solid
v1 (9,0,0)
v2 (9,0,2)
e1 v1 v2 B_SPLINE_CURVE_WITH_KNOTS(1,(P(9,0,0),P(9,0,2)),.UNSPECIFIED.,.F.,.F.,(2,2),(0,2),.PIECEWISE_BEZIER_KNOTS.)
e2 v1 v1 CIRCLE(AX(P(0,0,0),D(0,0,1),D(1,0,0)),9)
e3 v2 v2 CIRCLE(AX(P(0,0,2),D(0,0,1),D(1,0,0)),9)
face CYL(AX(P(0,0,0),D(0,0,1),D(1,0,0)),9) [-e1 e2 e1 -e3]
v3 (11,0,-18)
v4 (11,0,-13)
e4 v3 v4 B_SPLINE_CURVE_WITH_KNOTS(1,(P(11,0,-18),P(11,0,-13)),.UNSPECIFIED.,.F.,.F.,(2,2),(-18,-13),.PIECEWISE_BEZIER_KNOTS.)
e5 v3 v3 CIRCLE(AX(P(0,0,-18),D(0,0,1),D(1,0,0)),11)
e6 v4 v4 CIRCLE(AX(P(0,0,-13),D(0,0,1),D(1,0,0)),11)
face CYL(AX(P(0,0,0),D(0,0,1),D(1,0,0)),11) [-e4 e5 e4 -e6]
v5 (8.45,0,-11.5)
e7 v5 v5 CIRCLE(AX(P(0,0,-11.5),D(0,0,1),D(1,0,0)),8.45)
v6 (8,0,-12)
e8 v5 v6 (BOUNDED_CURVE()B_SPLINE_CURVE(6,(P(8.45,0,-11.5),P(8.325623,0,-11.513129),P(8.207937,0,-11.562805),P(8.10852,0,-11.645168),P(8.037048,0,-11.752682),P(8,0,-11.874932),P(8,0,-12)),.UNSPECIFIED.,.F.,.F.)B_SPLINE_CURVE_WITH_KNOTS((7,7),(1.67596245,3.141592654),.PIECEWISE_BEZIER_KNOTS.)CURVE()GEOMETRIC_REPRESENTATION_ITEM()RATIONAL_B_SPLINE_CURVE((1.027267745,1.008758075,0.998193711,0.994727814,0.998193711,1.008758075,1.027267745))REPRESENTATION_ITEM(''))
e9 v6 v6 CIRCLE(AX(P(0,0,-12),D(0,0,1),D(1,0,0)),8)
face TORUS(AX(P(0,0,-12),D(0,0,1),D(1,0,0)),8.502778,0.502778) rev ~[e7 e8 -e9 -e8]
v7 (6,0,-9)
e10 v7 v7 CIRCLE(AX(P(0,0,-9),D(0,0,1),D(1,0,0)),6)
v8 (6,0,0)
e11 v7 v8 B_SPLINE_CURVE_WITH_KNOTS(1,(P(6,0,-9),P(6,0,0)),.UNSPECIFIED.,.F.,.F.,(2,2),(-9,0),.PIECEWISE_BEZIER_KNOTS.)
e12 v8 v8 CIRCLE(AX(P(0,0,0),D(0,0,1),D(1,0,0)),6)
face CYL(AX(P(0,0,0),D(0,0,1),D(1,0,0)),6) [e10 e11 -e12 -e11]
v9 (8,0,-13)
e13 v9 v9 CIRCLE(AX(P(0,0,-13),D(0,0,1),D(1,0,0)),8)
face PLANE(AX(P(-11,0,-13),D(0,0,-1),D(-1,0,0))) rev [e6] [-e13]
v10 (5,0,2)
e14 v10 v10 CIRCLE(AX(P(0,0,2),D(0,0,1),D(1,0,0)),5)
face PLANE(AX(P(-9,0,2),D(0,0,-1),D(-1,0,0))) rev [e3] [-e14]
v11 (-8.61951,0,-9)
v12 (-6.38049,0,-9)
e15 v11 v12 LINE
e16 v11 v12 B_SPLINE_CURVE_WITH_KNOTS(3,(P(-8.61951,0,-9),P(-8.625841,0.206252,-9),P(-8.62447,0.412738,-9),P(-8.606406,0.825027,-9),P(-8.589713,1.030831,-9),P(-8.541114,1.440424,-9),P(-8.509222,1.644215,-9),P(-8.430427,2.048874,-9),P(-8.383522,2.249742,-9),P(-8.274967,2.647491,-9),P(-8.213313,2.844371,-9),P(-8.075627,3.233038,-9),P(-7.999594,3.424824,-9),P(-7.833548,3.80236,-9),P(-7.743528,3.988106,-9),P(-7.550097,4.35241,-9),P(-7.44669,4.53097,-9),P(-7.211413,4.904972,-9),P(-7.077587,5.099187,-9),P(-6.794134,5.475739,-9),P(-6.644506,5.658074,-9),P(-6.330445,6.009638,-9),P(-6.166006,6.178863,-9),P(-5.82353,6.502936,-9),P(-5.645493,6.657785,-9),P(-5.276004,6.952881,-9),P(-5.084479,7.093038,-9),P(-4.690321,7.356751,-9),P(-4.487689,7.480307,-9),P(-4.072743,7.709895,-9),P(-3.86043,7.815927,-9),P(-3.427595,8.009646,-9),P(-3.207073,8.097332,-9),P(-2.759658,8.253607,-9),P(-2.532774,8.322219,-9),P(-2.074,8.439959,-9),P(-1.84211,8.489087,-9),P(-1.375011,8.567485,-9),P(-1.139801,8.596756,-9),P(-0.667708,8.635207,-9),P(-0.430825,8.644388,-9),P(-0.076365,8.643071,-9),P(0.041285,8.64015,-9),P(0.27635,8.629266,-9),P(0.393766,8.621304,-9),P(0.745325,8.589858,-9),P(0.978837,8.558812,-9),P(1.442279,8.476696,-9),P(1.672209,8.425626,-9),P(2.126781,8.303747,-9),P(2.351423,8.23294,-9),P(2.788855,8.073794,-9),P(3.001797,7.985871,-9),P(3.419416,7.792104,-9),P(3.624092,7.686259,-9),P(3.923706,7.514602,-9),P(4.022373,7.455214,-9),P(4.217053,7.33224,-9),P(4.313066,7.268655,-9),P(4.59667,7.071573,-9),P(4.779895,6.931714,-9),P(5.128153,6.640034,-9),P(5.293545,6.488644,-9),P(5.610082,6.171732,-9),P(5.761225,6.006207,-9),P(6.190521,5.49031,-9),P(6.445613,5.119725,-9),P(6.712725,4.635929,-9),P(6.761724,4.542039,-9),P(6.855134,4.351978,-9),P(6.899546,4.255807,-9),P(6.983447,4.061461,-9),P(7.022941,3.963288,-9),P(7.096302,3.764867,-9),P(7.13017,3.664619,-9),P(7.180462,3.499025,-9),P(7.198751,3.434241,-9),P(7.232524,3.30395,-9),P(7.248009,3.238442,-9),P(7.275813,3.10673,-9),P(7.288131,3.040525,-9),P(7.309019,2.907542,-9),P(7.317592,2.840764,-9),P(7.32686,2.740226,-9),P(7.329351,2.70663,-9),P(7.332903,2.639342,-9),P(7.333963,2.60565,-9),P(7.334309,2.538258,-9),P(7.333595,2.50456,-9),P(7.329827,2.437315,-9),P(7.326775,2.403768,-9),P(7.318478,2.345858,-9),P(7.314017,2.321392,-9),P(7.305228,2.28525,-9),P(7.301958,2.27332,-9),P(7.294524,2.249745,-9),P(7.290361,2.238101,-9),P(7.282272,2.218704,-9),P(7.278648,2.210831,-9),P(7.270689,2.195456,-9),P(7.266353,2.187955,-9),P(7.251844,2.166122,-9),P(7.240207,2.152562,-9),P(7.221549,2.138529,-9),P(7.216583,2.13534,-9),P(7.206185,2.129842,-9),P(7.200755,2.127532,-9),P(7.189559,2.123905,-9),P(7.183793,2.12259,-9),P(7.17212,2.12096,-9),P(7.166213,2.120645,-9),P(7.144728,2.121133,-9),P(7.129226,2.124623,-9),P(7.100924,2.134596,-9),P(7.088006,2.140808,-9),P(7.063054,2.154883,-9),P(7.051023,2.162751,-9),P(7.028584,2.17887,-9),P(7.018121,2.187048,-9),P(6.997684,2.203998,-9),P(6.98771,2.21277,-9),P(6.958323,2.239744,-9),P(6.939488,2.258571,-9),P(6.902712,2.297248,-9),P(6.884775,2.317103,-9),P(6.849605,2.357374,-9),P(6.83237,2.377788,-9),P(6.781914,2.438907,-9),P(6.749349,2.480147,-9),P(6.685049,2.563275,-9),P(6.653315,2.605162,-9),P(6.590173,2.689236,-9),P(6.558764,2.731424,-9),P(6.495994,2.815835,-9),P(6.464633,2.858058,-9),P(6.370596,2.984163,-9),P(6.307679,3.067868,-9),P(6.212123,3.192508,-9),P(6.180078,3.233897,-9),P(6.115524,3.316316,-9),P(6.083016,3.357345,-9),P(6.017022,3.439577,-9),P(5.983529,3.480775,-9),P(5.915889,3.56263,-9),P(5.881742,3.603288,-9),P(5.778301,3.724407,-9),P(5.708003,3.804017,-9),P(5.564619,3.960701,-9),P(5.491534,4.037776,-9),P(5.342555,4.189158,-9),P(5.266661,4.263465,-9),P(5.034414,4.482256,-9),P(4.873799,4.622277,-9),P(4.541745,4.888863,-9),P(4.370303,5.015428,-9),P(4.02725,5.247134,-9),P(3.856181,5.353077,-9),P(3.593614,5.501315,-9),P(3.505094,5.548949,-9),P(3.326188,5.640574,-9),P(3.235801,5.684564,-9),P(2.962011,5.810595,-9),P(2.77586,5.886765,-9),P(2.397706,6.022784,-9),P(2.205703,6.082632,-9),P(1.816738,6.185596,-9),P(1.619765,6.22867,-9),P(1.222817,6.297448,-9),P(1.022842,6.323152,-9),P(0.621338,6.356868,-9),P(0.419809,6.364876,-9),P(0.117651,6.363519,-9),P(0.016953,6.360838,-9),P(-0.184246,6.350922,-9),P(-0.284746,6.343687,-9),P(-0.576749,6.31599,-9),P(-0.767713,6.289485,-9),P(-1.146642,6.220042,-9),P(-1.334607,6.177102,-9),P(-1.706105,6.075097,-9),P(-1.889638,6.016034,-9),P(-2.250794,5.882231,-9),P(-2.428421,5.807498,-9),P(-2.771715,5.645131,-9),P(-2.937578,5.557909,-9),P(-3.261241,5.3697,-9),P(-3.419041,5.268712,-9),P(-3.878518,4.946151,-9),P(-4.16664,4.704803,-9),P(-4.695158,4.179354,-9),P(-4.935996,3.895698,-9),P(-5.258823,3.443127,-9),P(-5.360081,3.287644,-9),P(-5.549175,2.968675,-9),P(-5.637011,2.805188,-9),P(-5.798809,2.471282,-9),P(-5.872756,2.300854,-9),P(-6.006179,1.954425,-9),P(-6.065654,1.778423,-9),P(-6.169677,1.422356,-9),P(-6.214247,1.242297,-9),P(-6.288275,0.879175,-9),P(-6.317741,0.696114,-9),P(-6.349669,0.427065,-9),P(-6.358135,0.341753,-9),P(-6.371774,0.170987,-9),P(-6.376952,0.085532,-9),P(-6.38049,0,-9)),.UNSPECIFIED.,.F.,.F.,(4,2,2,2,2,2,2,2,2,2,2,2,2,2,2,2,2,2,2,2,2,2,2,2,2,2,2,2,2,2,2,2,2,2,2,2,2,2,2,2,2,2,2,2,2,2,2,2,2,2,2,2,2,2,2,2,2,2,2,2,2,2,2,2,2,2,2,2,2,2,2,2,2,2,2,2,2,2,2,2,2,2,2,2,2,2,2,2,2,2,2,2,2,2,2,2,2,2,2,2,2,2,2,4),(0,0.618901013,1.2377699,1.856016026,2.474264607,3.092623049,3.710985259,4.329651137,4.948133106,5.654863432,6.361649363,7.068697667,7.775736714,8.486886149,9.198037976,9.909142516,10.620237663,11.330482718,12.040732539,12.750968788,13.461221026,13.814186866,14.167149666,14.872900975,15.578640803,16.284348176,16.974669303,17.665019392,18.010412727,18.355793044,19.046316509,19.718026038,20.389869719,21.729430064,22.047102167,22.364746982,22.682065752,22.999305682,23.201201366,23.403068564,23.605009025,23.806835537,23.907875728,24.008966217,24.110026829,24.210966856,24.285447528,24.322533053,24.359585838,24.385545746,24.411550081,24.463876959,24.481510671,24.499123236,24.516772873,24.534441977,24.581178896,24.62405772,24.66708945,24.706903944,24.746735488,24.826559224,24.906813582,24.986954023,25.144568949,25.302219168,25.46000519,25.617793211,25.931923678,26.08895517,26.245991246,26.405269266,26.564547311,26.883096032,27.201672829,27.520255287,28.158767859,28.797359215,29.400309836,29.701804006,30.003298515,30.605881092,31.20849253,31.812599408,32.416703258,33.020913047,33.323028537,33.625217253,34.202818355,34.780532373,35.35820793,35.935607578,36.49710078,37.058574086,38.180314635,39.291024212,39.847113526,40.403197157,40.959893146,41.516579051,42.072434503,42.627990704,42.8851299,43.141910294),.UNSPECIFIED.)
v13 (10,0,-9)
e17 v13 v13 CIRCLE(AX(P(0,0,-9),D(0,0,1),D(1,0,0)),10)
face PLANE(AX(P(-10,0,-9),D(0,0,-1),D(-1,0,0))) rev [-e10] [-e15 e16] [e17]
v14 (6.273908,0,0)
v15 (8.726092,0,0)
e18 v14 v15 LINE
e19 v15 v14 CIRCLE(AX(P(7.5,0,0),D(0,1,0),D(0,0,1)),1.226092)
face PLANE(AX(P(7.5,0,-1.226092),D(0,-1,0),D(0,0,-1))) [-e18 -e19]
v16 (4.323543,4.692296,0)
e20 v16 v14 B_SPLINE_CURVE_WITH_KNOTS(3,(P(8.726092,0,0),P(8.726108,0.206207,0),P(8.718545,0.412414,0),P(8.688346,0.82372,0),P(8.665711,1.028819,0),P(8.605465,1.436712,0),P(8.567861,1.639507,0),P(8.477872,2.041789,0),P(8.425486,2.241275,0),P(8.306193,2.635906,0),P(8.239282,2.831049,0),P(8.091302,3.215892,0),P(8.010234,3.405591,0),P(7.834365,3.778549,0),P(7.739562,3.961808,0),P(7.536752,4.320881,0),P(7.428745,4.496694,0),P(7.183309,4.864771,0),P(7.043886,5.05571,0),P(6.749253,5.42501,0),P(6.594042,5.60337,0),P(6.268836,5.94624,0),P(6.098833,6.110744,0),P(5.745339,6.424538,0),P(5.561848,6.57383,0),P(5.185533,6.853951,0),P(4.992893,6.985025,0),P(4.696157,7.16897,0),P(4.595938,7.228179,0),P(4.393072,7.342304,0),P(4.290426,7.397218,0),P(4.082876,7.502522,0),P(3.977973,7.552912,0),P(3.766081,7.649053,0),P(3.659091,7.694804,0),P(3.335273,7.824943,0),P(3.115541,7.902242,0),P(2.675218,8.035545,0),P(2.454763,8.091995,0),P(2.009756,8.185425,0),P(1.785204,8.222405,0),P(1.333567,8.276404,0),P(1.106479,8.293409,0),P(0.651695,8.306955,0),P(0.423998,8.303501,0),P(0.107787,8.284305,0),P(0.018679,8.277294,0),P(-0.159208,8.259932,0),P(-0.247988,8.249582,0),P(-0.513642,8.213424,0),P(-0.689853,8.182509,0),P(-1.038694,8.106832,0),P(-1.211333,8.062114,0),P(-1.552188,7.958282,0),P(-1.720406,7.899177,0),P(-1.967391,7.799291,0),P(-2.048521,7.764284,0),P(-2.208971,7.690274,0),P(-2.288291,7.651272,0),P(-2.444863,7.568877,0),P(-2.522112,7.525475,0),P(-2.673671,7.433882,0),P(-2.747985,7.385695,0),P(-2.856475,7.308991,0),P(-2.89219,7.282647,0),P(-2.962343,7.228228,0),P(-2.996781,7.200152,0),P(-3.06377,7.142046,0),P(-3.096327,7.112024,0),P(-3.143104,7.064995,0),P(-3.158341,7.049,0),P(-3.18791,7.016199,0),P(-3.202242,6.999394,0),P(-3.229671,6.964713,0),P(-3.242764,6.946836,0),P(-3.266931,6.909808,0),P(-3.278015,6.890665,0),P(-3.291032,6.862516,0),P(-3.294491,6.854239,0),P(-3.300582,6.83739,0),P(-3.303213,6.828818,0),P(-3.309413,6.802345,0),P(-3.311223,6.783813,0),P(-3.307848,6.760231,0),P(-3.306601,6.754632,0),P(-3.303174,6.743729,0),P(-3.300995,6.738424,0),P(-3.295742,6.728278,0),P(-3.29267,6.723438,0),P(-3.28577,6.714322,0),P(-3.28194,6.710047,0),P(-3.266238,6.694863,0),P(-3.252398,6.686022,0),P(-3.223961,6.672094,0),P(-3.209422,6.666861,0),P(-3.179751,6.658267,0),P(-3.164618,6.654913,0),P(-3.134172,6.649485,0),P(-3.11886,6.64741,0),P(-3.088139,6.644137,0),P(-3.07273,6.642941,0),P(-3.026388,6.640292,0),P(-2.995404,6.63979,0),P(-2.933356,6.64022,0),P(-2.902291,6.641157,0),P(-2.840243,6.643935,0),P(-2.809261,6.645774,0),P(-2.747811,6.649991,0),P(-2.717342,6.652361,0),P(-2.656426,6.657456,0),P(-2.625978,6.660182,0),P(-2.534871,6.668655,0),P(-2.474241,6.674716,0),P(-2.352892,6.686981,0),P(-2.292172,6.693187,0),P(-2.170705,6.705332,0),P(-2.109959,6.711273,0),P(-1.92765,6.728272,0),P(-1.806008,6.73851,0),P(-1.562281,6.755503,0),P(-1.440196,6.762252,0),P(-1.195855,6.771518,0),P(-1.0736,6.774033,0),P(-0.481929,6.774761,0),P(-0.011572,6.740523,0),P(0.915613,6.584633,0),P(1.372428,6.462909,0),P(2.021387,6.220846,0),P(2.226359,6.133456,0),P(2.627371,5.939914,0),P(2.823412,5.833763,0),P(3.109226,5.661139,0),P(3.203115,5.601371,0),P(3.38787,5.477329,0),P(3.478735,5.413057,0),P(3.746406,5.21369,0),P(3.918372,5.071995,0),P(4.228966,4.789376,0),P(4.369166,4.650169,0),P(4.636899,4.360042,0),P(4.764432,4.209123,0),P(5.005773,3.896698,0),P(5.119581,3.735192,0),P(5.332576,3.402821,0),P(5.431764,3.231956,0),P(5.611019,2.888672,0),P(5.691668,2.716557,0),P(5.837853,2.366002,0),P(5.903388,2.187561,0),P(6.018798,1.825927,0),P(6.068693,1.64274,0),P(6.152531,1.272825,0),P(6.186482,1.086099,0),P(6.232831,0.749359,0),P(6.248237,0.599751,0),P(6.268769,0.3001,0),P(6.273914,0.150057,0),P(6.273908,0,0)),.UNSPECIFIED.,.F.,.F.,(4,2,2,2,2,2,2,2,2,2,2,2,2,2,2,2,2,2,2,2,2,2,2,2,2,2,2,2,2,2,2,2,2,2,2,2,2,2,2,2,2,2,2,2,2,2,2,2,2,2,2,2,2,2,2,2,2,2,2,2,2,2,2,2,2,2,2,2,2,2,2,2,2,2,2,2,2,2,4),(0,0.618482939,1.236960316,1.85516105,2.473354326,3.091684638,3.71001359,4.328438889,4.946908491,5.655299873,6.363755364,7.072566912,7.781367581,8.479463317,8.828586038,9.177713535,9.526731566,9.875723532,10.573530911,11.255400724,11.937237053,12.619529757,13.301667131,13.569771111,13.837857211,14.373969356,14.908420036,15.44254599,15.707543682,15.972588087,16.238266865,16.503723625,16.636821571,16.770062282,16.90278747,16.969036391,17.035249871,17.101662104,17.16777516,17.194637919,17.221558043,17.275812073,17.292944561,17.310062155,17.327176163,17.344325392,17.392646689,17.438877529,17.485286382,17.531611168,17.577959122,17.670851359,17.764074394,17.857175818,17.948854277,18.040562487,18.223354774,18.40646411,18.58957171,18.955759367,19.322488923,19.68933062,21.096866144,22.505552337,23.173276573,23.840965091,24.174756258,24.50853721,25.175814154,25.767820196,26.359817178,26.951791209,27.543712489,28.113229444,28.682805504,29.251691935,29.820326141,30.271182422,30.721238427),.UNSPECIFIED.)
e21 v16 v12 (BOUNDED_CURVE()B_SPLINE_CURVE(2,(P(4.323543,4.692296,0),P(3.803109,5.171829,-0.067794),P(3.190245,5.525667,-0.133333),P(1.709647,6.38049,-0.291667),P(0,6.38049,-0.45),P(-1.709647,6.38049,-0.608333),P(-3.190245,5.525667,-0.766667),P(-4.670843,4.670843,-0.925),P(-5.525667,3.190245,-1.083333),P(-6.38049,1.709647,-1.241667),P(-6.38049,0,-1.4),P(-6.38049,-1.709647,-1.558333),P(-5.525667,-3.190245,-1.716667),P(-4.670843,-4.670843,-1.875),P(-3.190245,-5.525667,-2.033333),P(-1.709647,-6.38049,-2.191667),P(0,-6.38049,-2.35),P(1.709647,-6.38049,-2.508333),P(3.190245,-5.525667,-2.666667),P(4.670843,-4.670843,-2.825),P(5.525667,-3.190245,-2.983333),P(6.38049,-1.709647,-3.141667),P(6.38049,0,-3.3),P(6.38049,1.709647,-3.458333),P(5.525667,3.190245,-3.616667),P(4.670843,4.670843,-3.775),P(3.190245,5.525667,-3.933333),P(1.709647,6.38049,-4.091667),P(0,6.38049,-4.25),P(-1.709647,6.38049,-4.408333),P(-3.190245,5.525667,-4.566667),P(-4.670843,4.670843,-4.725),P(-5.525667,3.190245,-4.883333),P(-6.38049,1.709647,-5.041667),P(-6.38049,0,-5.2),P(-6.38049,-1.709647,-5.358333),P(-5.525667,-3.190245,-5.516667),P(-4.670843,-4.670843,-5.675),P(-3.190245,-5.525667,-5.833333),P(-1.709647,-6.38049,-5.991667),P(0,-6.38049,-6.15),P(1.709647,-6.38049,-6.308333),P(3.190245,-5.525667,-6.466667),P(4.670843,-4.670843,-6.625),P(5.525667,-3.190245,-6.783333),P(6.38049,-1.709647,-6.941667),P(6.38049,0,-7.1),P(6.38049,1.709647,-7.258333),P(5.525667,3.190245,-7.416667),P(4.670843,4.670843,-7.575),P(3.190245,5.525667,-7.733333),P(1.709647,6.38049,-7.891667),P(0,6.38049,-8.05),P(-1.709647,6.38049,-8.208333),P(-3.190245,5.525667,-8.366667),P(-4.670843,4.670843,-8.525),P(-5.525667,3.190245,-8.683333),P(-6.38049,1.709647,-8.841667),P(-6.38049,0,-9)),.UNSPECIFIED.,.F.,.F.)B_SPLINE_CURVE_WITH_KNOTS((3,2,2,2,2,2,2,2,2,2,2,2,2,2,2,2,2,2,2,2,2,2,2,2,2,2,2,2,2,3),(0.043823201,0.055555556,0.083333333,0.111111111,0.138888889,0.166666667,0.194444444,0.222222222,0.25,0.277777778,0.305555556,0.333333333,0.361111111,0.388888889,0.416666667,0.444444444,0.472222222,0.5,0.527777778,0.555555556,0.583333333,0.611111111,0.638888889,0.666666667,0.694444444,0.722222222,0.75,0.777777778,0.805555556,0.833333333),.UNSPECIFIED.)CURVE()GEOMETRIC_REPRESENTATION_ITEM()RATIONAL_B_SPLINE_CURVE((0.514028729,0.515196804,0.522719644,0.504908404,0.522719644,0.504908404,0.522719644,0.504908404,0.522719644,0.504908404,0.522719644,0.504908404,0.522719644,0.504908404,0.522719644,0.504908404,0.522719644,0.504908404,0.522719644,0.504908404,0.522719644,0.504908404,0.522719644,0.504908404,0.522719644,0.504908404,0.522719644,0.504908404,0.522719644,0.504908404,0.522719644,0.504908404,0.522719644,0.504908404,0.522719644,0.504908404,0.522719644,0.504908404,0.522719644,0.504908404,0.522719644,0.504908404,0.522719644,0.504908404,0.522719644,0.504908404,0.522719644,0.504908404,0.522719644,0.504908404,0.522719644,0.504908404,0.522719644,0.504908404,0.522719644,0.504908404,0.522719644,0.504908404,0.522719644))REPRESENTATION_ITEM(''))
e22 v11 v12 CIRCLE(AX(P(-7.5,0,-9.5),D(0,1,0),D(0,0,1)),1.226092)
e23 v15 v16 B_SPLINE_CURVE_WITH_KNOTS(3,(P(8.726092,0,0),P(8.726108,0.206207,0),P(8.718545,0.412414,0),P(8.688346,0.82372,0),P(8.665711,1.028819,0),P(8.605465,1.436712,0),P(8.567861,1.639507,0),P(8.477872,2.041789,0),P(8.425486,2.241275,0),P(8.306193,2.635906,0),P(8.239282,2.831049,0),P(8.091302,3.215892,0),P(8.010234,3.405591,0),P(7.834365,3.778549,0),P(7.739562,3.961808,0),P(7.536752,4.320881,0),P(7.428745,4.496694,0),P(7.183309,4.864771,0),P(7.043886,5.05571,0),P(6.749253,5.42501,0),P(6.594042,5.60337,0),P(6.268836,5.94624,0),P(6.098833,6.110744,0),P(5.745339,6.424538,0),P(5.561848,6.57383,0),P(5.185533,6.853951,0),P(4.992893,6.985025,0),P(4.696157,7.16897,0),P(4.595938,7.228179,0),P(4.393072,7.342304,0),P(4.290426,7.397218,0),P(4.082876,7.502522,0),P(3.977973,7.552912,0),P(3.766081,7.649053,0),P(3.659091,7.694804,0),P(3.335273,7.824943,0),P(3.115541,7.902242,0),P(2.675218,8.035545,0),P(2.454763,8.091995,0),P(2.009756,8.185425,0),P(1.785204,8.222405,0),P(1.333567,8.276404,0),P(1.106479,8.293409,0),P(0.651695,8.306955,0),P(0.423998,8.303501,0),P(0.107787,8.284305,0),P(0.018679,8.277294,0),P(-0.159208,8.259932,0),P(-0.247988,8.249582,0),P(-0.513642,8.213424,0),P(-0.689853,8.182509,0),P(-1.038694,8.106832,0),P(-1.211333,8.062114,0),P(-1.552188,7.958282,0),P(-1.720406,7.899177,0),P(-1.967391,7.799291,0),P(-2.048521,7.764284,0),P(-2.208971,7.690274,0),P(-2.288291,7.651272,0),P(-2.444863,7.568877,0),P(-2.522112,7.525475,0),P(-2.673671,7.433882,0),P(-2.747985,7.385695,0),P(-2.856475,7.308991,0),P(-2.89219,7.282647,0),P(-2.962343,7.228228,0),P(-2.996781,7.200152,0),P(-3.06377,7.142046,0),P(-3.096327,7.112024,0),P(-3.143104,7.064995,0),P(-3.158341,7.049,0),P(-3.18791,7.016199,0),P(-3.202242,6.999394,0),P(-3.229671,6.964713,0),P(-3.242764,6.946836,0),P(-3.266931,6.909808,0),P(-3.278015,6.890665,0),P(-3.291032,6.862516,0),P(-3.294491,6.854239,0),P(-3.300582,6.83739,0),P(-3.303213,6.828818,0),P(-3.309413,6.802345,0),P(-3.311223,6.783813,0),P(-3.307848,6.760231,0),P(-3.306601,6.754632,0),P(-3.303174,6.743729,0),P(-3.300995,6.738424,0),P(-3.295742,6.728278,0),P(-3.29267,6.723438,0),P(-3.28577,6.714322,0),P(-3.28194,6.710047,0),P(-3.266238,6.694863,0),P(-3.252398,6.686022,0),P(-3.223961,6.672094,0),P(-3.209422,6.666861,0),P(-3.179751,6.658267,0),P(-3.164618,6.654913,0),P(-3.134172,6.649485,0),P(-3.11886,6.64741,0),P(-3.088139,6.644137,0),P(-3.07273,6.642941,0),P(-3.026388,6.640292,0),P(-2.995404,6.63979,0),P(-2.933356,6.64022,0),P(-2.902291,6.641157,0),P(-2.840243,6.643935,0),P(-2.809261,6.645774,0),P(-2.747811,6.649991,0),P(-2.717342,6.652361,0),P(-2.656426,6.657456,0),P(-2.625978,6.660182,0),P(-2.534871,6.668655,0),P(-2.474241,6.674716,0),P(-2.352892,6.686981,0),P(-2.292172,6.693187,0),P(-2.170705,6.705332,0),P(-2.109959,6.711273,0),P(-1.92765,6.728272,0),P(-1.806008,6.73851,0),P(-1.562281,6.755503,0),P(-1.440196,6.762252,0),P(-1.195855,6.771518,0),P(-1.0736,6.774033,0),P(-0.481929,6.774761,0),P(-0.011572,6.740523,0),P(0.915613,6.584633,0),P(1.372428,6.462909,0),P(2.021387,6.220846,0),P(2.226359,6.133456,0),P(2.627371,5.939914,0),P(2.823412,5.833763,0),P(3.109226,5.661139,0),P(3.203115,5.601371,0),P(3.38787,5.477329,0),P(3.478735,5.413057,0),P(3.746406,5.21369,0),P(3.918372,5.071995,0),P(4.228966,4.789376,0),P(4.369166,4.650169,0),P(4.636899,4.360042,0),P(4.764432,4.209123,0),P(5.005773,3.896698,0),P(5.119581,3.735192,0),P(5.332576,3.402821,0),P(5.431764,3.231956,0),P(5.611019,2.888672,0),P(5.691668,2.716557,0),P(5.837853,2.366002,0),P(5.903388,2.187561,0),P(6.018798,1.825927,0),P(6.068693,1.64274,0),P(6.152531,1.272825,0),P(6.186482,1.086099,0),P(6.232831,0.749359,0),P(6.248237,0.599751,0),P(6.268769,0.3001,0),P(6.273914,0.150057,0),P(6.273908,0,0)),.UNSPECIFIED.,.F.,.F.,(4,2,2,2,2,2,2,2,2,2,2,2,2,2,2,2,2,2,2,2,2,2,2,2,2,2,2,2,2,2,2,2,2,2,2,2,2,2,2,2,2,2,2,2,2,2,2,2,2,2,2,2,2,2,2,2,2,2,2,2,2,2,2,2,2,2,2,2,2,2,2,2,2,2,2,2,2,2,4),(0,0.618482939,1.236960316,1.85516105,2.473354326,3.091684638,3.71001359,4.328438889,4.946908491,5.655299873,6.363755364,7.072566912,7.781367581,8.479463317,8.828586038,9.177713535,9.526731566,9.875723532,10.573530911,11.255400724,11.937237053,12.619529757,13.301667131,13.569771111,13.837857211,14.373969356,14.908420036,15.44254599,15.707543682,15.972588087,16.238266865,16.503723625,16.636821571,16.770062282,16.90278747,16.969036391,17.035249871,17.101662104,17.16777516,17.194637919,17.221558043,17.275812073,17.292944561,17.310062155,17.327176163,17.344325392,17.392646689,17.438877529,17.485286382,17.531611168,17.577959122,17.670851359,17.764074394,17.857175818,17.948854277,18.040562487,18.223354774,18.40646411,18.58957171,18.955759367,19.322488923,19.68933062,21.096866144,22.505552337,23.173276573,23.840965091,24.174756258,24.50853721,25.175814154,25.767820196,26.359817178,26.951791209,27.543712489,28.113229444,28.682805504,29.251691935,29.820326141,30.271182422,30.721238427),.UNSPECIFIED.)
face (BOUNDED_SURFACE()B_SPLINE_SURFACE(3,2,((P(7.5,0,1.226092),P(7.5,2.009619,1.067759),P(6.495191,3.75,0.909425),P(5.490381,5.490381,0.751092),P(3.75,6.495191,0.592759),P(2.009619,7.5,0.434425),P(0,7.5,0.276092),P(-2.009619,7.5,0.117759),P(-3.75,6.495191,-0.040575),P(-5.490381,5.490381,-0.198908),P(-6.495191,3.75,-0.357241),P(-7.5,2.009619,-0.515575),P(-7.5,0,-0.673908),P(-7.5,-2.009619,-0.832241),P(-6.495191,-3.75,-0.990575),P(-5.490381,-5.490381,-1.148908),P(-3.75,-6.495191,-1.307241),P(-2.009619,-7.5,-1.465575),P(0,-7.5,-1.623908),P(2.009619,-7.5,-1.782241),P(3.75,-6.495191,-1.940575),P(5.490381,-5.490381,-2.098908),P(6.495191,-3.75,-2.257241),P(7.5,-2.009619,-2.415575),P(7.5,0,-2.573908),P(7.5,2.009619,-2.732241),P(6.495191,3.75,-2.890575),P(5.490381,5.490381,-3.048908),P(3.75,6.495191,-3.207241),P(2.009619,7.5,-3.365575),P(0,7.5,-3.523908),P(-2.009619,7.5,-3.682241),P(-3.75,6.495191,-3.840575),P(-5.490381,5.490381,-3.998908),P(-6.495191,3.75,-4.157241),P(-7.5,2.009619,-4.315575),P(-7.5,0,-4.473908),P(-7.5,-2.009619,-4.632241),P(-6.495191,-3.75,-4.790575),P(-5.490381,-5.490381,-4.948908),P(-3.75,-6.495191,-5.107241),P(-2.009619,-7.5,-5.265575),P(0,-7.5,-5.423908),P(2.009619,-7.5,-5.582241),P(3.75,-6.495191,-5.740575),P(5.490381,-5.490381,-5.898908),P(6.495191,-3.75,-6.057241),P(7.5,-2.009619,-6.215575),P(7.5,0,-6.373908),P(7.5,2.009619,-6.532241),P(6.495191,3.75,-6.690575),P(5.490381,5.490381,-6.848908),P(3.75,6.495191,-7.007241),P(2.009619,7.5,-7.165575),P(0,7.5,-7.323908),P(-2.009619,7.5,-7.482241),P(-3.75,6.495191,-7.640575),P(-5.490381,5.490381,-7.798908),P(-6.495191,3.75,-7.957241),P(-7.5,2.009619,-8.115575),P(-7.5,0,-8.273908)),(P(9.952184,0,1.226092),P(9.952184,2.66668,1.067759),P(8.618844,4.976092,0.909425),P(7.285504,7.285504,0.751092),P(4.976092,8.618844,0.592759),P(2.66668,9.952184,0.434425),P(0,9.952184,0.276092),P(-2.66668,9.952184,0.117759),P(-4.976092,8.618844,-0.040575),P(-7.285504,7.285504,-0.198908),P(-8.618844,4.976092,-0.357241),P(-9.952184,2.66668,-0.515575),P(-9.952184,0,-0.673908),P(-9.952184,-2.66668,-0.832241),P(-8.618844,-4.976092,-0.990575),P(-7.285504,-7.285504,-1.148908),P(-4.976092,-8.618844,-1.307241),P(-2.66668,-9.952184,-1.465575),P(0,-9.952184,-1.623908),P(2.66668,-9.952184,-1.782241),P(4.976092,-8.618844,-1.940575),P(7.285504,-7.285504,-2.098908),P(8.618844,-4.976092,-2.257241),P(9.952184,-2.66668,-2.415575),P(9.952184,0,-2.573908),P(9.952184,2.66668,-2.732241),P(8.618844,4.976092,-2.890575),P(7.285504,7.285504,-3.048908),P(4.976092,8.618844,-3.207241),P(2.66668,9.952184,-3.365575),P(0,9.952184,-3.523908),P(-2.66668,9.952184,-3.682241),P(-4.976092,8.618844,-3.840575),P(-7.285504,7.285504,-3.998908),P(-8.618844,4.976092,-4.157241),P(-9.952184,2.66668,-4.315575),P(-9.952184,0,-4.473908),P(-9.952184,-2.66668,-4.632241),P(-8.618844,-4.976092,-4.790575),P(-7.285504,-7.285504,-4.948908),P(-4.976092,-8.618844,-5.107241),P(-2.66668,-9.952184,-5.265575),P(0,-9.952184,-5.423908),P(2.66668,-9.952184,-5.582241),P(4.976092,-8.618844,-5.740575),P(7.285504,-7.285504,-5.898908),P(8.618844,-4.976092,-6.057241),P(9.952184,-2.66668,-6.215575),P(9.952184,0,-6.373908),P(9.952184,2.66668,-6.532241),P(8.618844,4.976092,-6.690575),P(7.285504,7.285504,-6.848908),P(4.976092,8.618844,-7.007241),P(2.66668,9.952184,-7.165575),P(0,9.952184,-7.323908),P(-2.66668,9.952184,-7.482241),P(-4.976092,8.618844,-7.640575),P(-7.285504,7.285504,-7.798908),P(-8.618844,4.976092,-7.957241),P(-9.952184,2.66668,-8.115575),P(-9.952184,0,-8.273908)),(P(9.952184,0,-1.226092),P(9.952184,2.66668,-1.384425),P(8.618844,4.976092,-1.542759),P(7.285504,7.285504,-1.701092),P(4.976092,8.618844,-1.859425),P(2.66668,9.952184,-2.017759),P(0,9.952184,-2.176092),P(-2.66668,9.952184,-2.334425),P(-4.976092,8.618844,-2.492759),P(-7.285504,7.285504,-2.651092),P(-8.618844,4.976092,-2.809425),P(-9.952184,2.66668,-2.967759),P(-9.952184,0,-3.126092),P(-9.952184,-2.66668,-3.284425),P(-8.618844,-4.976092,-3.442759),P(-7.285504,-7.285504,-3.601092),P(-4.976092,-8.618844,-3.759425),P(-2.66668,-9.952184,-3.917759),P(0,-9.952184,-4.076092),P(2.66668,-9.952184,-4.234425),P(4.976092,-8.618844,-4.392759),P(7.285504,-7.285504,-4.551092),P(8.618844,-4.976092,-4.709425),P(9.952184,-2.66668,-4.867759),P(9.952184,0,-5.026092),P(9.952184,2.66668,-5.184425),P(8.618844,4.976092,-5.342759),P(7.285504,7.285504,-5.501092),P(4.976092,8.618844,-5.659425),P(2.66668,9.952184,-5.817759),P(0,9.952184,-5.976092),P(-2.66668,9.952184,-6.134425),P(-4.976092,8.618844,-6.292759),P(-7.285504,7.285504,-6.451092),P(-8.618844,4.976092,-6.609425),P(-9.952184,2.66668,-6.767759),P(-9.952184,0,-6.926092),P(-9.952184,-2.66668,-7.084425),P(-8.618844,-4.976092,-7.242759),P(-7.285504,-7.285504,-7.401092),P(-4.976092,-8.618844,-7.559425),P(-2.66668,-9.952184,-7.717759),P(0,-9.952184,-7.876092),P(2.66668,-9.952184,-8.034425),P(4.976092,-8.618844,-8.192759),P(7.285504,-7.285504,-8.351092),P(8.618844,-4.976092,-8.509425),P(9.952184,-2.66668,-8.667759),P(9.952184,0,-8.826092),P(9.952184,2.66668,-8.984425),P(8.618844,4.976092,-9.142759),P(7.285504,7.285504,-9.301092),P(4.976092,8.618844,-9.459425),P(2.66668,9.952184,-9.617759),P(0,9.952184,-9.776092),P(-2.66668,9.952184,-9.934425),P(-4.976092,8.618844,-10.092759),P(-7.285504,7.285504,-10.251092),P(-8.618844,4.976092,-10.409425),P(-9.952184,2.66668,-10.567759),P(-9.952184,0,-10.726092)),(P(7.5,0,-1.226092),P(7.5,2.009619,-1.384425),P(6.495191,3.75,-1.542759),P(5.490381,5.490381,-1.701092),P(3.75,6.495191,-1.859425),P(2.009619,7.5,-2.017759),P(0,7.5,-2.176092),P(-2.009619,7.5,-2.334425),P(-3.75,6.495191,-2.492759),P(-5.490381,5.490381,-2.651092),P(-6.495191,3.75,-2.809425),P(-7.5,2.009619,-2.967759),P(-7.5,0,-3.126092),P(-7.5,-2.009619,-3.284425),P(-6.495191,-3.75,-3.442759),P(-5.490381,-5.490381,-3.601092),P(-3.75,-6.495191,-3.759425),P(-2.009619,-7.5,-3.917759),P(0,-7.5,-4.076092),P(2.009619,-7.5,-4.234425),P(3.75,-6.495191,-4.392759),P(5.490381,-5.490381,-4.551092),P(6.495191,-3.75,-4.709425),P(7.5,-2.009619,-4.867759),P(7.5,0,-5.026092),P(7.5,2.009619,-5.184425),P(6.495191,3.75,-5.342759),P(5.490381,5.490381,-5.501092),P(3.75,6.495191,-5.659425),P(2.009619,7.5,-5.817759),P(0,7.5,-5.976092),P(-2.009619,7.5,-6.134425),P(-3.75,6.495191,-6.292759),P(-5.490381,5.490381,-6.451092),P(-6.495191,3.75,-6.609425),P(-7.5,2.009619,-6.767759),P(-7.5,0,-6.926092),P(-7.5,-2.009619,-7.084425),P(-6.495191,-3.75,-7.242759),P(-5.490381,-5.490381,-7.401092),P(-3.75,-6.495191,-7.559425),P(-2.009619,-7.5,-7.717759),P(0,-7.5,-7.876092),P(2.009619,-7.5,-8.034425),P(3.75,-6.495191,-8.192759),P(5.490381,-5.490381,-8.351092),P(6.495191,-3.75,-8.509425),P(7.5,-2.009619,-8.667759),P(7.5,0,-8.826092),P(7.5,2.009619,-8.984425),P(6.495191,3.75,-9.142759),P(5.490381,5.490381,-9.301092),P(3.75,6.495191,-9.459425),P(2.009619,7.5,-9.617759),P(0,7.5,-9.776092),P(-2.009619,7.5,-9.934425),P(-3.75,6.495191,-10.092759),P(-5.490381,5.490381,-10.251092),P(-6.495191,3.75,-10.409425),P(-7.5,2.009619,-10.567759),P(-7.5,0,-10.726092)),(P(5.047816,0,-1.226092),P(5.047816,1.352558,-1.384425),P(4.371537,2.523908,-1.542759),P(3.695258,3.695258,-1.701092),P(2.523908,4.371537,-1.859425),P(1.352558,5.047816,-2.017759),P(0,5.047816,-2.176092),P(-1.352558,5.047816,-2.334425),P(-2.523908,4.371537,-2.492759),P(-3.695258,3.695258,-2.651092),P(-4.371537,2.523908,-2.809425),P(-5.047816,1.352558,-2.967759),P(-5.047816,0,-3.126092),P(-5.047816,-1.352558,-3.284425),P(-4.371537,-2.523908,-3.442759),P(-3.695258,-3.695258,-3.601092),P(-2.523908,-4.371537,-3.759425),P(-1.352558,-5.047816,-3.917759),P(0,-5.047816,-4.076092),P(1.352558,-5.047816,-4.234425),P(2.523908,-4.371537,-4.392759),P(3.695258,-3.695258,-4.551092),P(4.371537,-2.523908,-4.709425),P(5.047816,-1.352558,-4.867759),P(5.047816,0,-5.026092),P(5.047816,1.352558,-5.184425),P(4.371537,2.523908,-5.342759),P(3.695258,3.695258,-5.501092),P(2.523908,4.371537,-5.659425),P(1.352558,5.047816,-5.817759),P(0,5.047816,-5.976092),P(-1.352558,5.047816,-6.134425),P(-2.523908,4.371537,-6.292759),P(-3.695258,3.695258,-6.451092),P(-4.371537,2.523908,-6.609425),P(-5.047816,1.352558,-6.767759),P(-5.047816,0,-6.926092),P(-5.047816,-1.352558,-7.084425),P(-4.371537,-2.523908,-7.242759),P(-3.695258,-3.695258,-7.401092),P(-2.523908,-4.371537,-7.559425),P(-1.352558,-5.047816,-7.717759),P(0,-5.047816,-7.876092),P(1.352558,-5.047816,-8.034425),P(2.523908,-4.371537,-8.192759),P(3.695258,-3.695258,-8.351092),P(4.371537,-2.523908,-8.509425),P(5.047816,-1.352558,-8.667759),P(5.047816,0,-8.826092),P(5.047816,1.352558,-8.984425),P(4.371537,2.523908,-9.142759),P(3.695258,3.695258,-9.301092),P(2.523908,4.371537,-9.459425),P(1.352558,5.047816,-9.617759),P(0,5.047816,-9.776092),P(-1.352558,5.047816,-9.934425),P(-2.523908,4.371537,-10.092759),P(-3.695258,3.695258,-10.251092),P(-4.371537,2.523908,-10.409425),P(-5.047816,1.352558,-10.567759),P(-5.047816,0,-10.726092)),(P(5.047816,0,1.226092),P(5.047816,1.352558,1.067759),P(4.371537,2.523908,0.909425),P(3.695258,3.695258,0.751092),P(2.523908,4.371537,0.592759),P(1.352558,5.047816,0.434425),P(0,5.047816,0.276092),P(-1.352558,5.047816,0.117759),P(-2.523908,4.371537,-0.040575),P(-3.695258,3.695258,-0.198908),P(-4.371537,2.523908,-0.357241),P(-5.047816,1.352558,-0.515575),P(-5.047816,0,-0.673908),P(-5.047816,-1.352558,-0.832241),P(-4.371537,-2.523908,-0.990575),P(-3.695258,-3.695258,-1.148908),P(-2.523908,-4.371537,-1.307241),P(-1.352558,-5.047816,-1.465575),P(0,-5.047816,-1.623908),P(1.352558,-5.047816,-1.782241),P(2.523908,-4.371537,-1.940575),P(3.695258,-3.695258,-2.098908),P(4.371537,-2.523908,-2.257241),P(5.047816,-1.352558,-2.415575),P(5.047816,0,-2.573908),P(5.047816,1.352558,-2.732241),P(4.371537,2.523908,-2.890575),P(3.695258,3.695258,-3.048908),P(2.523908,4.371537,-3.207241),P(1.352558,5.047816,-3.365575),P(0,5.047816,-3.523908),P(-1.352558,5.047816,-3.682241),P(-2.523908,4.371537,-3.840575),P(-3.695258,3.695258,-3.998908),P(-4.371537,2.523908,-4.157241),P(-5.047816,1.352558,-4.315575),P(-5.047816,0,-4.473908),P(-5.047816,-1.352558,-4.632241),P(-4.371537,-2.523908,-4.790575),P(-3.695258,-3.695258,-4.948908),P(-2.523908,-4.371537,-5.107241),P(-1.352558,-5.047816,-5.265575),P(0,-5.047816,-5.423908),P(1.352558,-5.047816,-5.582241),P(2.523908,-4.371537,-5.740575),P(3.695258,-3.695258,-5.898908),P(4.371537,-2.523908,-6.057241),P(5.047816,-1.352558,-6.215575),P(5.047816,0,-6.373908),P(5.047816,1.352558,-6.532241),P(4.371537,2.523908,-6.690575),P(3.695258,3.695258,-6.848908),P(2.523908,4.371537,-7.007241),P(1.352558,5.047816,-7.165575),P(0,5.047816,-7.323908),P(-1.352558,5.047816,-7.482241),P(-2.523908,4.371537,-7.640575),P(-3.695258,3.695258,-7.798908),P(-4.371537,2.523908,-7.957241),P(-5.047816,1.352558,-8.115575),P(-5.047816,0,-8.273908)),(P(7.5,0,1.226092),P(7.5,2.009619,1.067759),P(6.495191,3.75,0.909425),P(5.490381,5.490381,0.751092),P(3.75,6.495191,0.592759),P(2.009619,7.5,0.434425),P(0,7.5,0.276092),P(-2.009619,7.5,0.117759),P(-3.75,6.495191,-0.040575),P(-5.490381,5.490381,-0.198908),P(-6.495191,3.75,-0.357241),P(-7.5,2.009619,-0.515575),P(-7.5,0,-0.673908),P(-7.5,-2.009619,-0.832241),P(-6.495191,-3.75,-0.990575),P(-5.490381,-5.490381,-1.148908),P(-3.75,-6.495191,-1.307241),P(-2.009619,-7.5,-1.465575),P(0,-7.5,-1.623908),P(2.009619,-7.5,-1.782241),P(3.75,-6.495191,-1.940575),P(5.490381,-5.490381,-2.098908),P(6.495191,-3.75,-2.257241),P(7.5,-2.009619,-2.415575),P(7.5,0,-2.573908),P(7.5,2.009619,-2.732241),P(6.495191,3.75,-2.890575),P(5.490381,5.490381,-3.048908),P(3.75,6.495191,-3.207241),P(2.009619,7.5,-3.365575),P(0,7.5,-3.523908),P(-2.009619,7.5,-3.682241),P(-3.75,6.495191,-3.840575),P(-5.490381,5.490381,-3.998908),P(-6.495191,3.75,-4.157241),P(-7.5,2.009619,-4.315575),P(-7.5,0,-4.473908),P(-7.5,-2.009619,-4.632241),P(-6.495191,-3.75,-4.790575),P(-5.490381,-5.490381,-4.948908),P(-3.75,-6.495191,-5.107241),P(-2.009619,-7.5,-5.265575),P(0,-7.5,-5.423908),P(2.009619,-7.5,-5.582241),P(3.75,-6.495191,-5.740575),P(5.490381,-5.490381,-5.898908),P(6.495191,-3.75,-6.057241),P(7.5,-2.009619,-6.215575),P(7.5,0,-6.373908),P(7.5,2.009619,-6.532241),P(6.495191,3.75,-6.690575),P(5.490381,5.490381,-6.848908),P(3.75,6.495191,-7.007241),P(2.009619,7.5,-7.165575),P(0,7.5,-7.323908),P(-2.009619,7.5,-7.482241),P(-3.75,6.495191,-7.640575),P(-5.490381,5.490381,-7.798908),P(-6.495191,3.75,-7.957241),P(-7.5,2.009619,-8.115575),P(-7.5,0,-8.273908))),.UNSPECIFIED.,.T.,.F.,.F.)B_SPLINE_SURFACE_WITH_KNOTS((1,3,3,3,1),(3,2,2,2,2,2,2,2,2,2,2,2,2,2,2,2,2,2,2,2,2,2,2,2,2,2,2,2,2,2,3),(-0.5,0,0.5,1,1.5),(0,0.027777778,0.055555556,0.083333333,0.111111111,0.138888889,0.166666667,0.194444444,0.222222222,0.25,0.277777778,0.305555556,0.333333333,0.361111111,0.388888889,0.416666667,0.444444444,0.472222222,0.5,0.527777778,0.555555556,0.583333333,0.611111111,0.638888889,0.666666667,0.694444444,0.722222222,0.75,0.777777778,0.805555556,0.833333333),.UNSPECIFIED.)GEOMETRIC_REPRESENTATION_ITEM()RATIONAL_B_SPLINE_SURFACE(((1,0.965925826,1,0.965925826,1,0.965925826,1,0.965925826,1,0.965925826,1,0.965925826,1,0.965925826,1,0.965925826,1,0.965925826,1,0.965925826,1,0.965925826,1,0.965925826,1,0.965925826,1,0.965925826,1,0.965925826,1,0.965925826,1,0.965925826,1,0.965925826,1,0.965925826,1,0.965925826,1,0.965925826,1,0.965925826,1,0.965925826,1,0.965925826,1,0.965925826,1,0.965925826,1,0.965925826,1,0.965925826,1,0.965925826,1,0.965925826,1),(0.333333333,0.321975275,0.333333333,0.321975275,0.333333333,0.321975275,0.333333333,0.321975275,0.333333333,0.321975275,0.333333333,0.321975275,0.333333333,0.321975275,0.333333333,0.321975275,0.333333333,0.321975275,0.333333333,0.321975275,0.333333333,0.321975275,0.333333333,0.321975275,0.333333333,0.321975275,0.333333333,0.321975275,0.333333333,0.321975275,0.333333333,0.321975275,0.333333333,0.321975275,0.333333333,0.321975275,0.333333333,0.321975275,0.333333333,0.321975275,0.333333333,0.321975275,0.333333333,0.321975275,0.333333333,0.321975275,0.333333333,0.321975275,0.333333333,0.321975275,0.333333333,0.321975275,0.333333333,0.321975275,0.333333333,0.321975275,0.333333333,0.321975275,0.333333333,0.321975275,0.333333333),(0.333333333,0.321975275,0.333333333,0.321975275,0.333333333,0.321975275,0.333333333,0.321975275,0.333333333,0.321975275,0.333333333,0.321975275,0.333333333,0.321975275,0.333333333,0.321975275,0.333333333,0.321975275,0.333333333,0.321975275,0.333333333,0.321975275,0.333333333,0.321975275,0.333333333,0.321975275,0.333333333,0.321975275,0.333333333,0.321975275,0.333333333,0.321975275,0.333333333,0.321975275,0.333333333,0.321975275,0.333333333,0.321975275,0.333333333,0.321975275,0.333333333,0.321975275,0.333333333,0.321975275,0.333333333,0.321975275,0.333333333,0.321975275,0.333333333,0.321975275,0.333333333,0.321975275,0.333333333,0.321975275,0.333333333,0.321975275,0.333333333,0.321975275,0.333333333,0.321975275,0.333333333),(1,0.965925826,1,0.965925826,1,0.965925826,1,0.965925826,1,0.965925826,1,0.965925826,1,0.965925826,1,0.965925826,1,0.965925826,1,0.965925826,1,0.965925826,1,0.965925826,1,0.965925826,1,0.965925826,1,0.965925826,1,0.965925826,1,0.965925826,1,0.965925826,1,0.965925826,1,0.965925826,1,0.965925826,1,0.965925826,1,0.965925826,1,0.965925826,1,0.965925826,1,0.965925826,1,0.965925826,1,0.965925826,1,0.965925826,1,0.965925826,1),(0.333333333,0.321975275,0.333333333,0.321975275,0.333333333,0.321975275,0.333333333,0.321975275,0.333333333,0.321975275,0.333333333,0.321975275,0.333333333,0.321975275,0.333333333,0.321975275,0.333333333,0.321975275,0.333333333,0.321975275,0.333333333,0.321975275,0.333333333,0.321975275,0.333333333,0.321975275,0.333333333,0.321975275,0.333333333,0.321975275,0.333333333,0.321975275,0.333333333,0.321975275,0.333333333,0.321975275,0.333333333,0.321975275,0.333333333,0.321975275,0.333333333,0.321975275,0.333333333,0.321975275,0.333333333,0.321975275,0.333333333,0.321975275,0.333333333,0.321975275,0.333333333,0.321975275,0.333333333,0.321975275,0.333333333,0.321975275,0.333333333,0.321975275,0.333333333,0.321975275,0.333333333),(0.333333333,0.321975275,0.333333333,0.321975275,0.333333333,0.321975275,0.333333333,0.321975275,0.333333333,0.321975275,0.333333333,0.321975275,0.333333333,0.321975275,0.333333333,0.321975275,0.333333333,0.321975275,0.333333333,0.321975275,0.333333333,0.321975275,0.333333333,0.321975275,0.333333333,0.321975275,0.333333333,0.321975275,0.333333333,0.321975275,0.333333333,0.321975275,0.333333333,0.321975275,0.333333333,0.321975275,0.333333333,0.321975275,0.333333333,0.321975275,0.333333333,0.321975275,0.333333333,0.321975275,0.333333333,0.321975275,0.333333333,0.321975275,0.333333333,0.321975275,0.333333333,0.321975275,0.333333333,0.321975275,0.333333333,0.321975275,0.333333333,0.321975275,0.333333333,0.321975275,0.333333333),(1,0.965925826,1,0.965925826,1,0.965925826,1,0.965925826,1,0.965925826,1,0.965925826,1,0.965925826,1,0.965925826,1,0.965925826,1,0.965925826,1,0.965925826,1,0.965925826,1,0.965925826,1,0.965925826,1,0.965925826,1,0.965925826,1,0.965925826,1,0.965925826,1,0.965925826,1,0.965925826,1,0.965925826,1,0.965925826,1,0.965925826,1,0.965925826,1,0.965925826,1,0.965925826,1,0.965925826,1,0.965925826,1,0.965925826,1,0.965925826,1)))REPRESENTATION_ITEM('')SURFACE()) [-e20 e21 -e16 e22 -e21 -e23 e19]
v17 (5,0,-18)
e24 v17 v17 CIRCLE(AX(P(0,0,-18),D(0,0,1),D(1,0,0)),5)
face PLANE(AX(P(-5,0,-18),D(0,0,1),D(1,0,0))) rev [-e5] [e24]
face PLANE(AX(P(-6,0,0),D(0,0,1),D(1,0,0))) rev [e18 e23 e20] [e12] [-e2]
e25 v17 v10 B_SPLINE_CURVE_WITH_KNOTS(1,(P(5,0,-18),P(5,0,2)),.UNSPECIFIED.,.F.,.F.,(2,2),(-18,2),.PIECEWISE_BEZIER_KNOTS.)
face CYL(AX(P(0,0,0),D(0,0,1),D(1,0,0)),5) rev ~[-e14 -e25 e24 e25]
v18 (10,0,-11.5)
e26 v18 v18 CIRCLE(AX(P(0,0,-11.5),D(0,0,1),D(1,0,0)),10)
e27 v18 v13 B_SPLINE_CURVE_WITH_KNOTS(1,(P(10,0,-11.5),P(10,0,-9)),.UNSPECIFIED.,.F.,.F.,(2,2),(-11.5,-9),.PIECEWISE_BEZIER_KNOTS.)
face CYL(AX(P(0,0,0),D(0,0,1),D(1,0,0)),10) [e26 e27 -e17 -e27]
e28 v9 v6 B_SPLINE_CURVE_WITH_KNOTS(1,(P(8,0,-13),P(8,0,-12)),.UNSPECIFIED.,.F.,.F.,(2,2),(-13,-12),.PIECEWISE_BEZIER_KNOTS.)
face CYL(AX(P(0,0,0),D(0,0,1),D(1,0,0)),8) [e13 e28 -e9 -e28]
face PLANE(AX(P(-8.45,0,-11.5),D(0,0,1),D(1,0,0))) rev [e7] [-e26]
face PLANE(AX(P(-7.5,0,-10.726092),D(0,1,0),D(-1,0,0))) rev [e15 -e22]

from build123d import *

# Parameters (mm, degrees)
BARRER1_PITCH = 3.8


with BuildPart() as part:
    # Croquis2 → Revolución1 (revolve)
    with BuildSketch(Plane(origin=(0, 0, 0), x_dir=(1, 0, 0), z_dir=(0, 1, 0)), mode=Mode.PRIVATE) as revoluci_n1_sk:
        with BuildLine():
            Line((-5, 18), (-11, 18))
            Line((-11, 18), (-11, 13))
            Line((-11, 13), (-8, 13))
            Line((-8, 13), (-8, 12))
            ThreePointArc((-8, 12), (-8.129065999, 11.663659399), (-8.45, 11.5))
            Line((-8.45, 11.5), (-10, 11.5))
            Line((-10, 11.5), (-10, 9))
            Line((-10, 9), (-6, 9))
            Line((-6, 9), (-6, 0))
            Line((-6, 0), (-9, 0))
            Line((-9, 0), (-9, -2))
            Line((-9, -2), (-5, -2))
            Line((-5, -2), (-5, 18))
        make_face()
    revolve(revoluci_n1_sk.sketch.rotate(Axis((0, 0, 0), (0, 0, -1)), 180), axis=Axis((0, 0, 0), (0, 0, -1)))

    # Barrer1: the profile of Croquis4 screwed along a left-hand helix of 2.5 turns, 12 arcs to a turn; built about Z, then put on its axis
    barrer1_z = Axis((0, 0, 0), (0, 0, 1))
    barrer1_corners = [(8.726092033, 0, 0), (7.5, 0, 1.226092033), (6.273907967, 0, 0), (7.5, 0, -1.226092033)]
    with BuildLine(mode=Mode.PRIVATE) as barrer1_profile:
        ThreePointArc((8.726092033, 0, 0), (8.366977991, 0, 0.866977991), (7.5, 0, 1.226092033))
        ThreePointArc((7.5, 0, 1.226092033), (6.633022009, 0, 0.866977991), (6.273907967, 0, 0))
        ThreePointArc((6.273907967, 0, 0), (6.633022009, 0, -0.866977991), (7.5, 0, -1.226092033))
        ThreePointArc((7.5, 0, -1.226092033), (8.366977991, 0, -0.866977991), (8.726092033, 0, 0))
    barrer1_cap = Face(barrer1_profile.wire())
    barrer1_arcs = [((8.726092033, 0, 0), (8.726092033, 0, 1.226092033), (7.5, 0, 1.226092033), (1, 0.7071067811865476, 1)), ((7.5, 0, 1.226092033), (6.273907967, 0, 1.226092033), (6.273907967, 0, 0), (1, 0.7071067811865476, 1)), ((6.273907967, 0, 0), (6.273907967, 0, -1.226092033), (7.5, 0, -1.226092033), (1, 0.7071067811865476, 1)), ((7.5, 0, -1.226092033), (8.726092033, 0, -1.226092033), (8.726092033, 0, 0), (1, 0.7071067811865476, 1))]  # start, shoulder, end, weights
    barrer1_turn_angles = [0, -15, -30, -45, -60, -75, -90, -105, -120, -135, -150, -165, -180, -195, -210, -225, -240, -255, -270, -285, -300, -315, -330, -345, -360]
    barrer1_turn_weights = [1, 0.9659258262890683, 1, 0.9659258262890683, 1, 0.9659258262890683, 1, 0.9659258262890683, 1, 0.9659258262890683, 1, 0.9659258262890683, 1, 0.9659258262890683, 1, 0.9659258262890683, 1, 0.9659258262890683, 1, 0.9659258262890683, 1, 0.9659258262890683, 1, 0.9659258262890683, 1]
    barrer1_turn_sides = [Face.make_bezier_surface([[Vector(p[j][0], p[j][1], 0).rotate(barrer1_z, barrer1_turn_angles[2 * i + k]) / barrer1_turn_weights[2 * i + k] + Vector(0, 0, p[j][2] + -BARRER1_PITCH * barrer1_turn_angles[2 * i + k] / 360) for k in range(3)] for j in range(3)], [[p[3][j] * barrer1_turn_weights[2 * i + k] for k in range(3)] for j in range(3)]) for p in barrer1_arcs for i in range(12)]
    barrer1_last_angles = [-720, -735, -750, -765, -780, -795, -810, -825, -840, -855, -870, -885, -900]
    barrer1_last_weights = [1, 0.9659258262890683, 1, 0.9659258262890683, 1, 0.9659258262890683, 1, 0.9659258262890683, 1, 0.9659258262890683, 1, 0.9659258262890629, 1]
    barrer1_last_sides = [Face.make_bezier_surface([[Vector(p[j][0], p[j][1], 0).rotate(barrer1_z, barrer1_last_angles[2 * i + k]) / barrer1_last_weights[2 * i + k] + Vector(0, 0, p[j][2] + -BARRER1_PITCH * barrer1_last_angles[2 * i + k] / 360) for k in range(3)] for j in range(3)], [[p[3][j] * barrer1_last_weights[2 * i + k] for k in range(3)] for j in range(3)]) for p in barrer1_arcs for i in range(6)]
    barrer1 = Plane(origin=(0, 0, 0), x_dir=(1, 0, 0), z_dir=(0, 0, -1)) * Solid(Shell([*[p.moved(Location((0, 0, BARRER1_PITCH * i))) for i in range(2) for p in barrer1_turn_sides], *barrer1_last_sides, barrer1_cap, barrer1_cap.rotate(barrer1_z, -900).moved(Location((0, 0, -BARRER1_PITCH * -900 / 360)))]))
    add(barrer1)


solid = part.part
